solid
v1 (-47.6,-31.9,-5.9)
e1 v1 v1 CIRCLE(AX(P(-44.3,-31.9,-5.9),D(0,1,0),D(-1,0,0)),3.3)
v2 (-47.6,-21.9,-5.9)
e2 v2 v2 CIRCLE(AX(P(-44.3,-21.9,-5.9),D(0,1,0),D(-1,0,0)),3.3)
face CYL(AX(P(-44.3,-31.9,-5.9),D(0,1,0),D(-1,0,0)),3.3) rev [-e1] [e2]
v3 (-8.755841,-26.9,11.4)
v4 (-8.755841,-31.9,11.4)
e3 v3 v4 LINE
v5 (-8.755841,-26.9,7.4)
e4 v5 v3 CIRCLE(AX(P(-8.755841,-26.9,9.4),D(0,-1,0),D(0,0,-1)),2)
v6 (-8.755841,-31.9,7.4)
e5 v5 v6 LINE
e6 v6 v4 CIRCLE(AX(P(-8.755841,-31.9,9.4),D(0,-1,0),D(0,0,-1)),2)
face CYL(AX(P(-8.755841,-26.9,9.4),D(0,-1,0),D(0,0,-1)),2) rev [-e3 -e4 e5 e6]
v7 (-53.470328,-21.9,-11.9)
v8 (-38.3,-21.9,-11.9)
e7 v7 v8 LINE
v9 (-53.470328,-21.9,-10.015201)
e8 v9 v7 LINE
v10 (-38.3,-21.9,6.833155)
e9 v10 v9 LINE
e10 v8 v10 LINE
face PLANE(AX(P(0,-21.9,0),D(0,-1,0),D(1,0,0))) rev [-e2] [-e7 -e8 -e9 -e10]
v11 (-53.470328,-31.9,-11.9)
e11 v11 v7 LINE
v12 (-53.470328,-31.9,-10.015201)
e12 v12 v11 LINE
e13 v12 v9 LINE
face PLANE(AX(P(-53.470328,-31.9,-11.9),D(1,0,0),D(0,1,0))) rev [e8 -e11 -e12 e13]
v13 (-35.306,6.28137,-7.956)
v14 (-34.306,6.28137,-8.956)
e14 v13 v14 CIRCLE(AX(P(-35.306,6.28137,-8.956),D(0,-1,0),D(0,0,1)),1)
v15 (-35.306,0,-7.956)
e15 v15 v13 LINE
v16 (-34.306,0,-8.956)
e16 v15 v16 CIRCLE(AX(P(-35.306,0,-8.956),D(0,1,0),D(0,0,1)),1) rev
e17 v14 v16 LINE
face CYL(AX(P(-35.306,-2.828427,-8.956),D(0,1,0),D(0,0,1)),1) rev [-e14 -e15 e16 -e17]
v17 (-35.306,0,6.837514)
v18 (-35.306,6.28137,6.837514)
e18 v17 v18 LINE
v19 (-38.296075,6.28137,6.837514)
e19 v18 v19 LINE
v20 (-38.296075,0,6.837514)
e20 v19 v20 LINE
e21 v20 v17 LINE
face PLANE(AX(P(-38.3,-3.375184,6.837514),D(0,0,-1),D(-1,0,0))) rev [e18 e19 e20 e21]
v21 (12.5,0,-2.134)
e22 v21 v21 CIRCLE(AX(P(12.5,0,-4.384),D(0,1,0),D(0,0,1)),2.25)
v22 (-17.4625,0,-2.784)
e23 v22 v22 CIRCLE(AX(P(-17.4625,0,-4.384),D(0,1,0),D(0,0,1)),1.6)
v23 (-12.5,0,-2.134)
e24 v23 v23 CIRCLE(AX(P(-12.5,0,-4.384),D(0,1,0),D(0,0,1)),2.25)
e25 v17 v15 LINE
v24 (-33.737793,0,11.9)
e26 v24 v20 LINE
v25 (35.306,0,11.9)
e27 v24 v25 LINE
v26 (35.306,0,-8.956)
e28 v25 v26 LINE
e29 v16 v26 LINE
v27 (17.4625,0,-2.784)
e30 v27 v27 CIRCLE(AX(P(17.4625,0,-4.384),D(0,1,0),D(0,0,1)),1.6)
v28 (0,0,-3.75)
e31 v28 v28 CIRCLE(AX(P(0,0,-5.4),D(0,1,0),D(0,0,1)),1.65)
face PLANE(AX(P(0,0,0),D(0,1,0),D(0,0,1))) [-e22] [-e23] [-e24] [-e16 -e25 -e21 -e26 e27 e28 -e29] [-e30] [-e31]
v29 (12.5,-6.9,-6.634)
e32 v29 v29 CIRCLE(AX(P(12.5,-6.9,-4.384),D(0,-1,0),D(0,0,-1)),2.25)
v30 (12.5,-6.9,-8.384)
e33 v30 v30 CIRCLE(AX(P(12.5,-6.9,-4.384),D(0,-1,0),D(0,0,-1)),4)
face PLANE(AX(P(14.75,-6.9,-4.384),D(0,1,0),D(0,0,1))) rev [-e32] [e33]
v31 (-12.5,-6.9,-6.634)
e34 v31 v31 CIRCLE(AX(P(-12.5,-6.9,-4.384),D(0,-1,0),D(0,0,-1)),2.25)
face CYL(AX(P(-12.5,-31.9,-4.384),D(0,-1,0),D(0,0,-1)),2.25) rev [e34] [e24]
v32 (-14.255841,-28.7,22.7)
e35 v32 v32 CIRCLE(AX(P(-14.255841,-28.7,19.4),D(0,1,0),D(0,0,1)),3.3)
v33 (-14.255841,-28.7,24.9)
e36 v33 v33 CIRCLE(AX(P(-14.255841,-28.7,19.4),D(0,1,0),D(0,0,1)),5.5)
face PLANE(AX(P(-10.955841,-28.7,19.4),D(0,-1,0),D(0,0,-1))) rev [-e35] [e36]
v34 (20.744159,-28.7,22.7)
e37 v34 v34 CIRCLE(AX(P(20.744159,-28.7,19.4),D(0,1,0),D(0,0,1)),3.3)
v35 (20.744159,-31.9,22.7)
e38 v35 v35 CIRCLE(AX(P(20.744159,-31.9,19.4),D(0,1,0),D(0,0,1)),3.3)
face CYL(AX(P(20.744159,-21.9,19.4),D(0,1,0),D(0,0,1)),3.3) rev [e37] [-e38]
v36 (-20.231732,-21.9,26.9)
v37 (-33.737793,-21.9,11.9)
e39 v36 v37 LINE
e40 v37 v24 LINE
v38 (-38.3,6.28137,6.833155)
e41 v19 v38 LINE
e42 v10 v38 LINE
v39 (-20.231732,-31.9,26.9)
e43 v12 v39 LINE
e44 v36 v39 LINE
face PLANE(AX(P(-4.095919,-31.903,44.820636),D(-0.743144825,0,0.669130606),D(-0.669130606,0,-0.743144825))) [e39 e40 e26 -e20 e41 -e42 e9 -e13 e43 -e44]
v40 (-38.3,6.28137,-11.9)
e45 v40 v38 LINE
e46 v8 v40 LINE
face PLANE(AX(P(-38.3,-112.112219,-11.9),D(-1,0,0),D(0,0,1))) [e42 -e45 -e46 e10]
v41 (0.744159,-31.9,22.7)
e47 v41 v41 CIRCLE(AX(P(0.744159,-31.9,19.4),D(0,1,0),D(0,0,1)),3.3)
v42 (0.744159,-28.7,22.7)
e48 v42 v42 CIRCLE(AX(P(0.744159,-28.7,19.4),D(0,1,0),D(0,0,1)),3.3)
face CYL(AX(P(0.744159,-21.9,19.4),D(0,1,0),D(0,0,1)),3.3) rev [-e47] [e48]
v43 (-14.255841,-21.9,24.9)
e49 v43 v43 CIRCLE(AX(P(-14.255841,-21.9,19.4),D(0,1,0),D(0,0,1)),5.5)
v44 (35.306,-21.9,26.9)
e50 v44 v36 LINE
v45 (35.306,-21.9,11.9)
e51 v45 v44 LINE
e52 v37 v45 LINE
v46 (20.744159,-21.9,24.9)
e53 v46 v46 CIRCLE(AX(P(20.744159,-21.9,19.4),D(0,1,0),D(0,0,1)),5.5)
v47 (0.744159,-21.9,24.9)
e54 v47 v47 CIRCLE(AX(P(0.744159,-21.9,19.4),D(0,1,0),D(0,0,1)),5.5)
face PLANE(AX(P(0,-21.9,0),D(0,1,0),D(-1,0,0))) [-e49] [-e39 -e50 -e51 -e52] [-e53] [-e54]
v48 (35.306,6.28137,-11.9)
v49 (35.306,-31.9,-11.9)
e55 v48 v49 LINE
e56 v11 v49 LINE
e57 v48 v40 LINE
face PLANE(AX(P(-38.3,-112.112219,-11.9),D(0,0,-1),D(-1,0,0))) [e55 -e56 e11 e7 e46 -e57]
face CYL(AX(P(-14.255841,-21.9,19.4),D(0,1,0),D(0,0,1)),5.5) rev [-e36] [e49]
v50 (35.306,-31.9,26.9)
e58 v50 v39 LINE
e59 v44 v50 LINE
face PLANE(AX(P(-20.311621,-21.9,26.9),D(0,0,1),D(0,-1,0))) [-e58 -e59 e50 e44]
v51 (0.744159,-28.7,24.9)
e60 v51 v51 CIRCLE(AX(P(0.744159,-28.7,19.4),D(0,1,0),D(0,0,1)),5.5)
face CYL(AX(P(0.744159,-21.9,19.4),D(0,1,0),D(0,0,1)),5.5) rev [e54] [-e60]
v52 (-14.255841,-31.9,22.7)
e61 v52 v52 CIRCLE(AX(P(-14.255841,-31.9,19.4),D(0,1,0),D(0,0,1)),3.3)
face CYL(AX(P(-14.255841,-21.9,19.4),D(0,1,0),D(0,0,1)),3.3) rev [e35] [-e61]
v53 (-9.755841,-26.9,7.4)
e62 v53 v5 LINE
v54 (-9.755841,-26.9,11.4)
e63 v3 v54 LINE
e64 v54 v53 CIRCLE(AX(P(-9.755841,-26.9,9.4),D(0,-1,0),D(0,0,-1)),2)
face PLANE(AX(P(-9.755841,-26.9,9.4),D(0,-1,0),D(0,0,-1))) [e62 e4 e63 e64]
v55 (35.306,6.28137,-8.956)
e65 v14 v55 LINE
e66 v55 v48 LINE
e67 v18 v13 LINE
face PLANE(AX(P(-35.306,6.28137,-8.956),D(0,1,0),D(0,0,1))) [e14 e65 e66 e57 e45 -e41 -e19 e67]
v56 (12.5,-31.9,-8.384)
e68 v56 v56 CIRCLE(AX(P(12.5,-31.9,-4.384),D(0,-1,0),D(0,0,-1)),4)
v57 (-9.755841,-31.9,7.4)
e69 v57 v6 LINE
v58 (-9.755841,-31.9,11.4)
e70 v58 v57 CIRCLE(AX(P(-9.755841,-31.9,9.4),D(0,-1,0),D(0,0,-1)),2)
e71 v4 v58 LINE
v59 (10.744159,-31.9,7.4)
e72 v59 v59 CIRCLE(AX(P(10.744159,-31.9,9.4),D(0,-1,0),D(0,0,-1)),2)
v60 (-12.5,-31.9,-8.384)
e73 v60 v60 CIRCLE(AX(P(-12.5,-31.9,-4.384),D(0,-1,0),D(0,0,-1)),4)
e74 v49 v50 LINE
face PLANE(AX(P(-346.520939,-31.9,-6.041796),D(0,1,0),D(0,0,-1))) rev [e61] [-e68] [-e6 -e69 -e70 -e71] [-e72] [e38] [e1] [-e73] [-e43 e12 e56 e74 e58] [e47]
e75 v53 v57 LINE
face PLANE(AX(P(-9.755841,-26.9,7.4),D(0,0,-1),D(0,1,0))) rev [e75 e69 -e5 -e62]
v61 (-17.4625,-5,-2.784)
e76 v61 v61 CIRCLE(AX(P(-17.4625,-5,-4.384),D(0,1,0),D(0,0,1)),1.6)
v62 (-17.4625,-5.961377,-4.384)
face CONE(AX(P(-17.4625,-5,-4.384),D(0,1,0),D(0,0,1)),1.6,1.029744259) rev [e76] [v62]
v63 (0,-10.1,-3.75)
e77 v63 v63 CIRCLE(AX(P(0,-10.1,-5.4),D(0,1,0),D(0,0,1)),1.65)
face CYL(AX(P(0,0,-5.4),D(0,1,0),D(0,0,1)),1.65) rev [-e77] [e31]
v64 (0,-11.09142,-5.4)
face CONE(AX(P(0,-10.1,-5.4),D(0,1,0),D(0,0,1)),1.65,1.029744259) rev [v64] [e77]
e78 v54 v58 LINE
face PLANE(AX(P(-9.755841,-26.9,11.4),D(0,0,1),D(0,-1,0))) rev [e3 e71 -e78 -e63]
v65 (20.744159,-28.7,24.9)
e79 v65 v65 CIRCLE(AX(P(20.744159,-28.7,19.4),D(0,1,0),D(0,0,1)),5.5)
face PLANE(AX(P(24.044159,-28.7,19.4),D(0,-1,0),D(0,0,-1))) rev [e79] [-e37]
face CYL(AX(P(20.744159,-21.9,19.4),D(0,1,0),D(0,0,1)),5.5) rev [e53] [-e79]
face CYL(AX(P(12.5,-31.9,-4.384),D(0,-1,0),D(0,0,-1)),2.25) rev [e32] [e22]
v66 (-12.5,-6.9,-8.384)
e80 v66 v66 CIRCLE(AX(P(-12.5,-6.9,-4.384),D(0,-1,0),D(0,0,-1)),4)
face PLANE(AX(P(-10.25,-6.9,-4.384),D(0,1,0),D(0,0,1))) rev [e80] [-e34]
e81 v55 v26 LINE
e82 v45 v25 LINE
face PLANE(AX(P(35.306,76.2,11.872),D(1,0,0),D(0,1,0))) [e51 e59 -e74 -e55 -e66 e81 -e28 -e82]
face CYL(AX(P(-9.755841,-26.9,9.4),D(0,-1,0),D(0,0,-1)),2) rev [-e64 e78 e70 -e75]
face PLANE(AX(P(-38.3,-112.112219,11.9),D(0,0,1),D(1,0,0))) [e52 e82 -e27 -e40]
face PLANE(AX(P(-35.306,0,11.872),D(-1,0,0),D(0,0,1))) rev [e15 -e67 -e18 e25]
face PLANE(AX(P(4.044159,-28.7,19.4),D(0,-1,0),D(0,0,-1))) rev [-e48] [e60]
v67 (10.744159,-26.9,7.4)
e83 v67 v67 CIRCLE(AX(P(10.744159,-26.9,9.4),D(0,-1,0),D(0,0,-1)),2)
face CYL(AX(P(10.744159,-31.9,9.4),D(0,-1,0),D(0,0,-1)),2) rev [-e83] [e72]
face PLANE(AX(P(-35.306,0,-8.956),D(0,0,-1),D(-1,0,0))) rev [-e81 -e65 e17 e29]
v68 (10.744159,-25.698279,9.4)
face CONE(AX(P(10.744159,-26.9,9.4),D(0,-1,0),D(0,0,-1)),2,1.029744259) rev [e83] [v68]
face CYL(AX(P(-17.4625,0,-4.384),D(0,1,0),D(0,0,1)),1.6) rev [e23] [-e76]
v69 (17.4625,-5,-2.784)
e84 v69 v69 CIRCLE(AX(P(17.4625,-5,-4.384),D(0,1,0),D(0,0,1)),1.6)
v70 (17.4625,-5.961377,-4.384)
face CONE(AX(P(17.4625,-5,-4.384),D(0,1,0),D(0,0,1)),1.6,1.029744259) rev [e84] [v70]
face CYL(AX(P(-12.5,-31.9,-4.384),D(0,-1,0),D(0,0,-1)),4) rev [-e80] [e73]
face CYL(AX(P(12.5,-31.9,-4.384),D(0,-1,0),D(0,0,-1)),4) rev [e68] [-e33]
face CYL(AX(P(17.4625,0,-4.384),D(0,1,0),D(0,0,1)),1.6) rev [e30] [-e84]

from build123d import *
from build123d.topology import SkipClean

# Parameters (mm, degrees)
SKETCH_1_W                = 76.6
SKETCH_1_H                = 23.8
EXTRUDE_1_DEPTH           = 31.899999991
HOLE_WIZARD_M4_1_D        = 3.3
HOLE_WIZARD_M4_1_DEPTH    = 10.1
HOLE_WIZARD_M4_1_TIP      = 0.991420021
SKETCH_5_W                = 23.8
SKETCH_5_H                = 2.281370048
EXTRUDE_2_DEPTH           = 2.994
SKETCH_6_W                = 76.6
SKETCH_6_H                = 2.281370048
EXTRUDE_3_DEPTH           = 2.944
CUT_EXTRUDE_START         = -2.994
SKETCH_7_W                = 26.992148155
SKETCH_7_H                = 47.339562986
CUT_EXTRUDE_1_DEPTH       = 2.994
EXTRUDE_4_DEPTH           = 10
HOLE_WIZARD_3_D           = 6.6
HOLE_WIZARD_3_CBORE_D     = 11
HOLE_WIZARD_3_CBORE_DEPTH = 6.8
SKETCH_21_R               = 3.3
CUT_EXTRUDE_6_DEPTH       = 67.034934903
MM_2_D                    = 4
MM_2_DEPTH                = 5
MM_2_TIP                  = 1.201721238
CUT_EXTRUDE_7_DEPTH       = 5
SKETCH_26_W               = 46.053862543
SKETCH_26_H               = 10
CUT_EXTRUDE_8_DEPTH       = 76.924939501
CUT_EXTRUDE_9_DEPTH       = 67.034934903
SKETCH_29_R               = 1
CUT_EXTRUDE_10_DEPTH      = 2.281370048
EXTRUDE_START             = 4
EXTRUDE_5_DEPTH           = 4
CUT_EXTRUDE_11_DEPTH      = 0.5
EXTRUDE_6_DEPTH           = 0.440630619
CUT_EXTRUDE_12_DEPTH      = 28.181370038
SKETCH_35_W               = 0.294839433
SKETCH_35_H               = 10
CUT_EXTRUDE_13_DEPTH      = 100.471808588
CHAMFER_1_SIZE            = 2
HOLE_WIZARD_4_D           = 4.5
HOLE_WIZARD_4_CBORE_D     = 8
HOLE_WIZARD_4_CBORE_DEPTH = 25
CUT_EXTRUDE_14_DEPTH      = 67.233425798
CUT_EXTRUDE_15_DEPTH      = 6.281370048


with BuildPart() as part:
    # 草图1 → 凸台-拉伸1 (new body)
    with BuildSketch(Plane(origin=(0, 0, 0), x_dir=(1, 0, 0), z_dir=(0, 1, 0))):
        Rectangle(SKETCH_1_W, SKETCH_1_H)
    extrude(amount=-EXTRUDE_1_DEPTH)

    # M4 螺纹孔1
    with Locations(Plane(origin=(0, 0, -5.4), x_dir=(0, 0, 1), z_dir=(0, 1, 0))):
        with Locations((0, 0)):
            Hole(HOLE_WIZARD_M4_1_D / 2, depth=HOLE_WIZARD_M4_1_DEPTH)
            with Locations((0, 0, -(HOLE_WIZARD_M4_1_DEPTH + HOLE_WIZARD_M4_1_TIP / 2))):  # 118° drill point
                Cone(0, HOLE_WIZARD_M4_1_D / 2, HOLE_WIZARD_M4_1_TIP, mode=Mode.SUBTRACT)

    # 草图5 → 凸台-拉伸2 (add)
    with BuildSketch(Plane.ZY.offset(38.3)):
        with Locations((0, 1.140685024)):
            Rectangle(SKETCH_5_W, SKETCH_5_H)
    extrude(amount=-EXTRUDE_2_DEPTH)

    # 草图6 → 凸台-拉伸3 (add)
    with BuildSketch(Plane(origin=(0, 0, -11.9), x_dir=(-1, 0, 0), z_dir=(0, 0, -1))):
        with Locations((0, 1.140685024)):
            Rectangle(SKETCH_6_W, SKETCH_6_H)
    extrude(amount=-EXTRUDE_3_DEPTH)

    # 草图7 → 切除-拉伸1 (cut)
    with BuildSketch(Plane(origin=(38.3, 0, 0), x_dir=(0, 0, -1), z_dir=(1, 0, 0)).offset(CUT_EXTRUDE_START)):
        with Locations((-1.596074077, -8.230218498)):
            Rectangle(SKETCH_7_W, SKETCH_7_H)
    extrude(amount=CUT_EXTRUDE_1_DEPTH, mode=Mode.SUBTRACT)

    # 草图9 → 大小mm 暗销孔1 (revolve, cut)
    with BuildSketch(Plane(origin=(17.4625, 0, -4.384), x_dir=(0, 0, 1), z_dir=(1, 0, 0))):
        Polygon((0, 0), (0, 5.96137699), (1.6, 5), (1.6, 0), align=None)
    mm_1 = revolve(axis=Axis((17.4625, 6.35, -4.384), (0, -1, 0)), mode=Mode.SUBTRACT)

    # 镜向3: 大小mm 暗销孔1 across plane
    add(mm_1.mirror(Plane(origin=(0, 0, 0), x_dir=(0, 0, 1), z_dir=(1, 0, 0))), mode=Mode.SUBTRACT)

    # 草图16 → 凸台-拉伸4 (add)
    with BuildSketch(Plane.XZ.offset(31.899999991)):
        Polygon((-38.3, 6.921881597), (-55.247298311, -11.9), (-38.3, -11.9), align=None)
        Polygon((-33.817682057, 11.9), (-20.311621392, 26.9), (35.306, 26.9), (35.306, 11.9), align=None)
    extrude(amount=-EXTRUDE_4_DEPTH)

    # 打孔尺寸(%根据)内六角圆柱头螺钉的类型3 (through all)
    with Locations(Plane(origin=(-14.255841028, -21.899999991, 19.4), x_dir=(1, 0, 0), z_dir=(0, 1, 0))):
        with Locations((0, 0), (15, 0), (35, 0)):
            CounterBoreHole(HOLE_WIZARD_3_D / 2, HOLE_WIZARD_3_CBORE_D / 2, HOLE_WIZARD_3_CBORE_DEPTH)

    # 草图21 → 切除-拉伸6 (cut, through all)
    with BuildSketch(Plane(origin=(0, -21.899999991, 0), x_dir=(1, 0, 0), z_dir=(0, 1, 0))):
        with Locations(Location((-44.3, 5.9, 0), (0, 0, 180))):
            Circle(SKETCH_21_R)
    extrude(amount=-CUT_EXTRUDE_6_DEPTH, mode=Mode.SUBTRACT)

    # 大小mm 暗销孔2
    with Locations(Plane(origin=(10.744158972, -31.899999991, 9.4), x_dir=(0, 0, -1), z_dir=(0, -1, 0))):
        with Locations((0, 0)):
            Hole(MM_2_D / 2, depth=MM_2_DEPTH)
            with Locations((0, 0, -(MM_2_DEPTH + MM_2_TIP / 2))):  # 118° drill point
                Cone(0, MM_2_D / 2, MM_2_TIP, mode=Mode.SUBTRACT)

    # 草图25 → 切除-拉伸7 (cut)
    with BuildSketch(Plane.XZ.offset(31.899999991)):
        with BuildLine():
            Line((-9.755841028, 11.4), (-8.755841028, 11.4))
            ThreePointArc((-8.755841028, 11.4), (-6.755841028, 9.4), (-8.755841028, 7.4))
            Line((-8.755841028, 7.4), (-9.755841028, 7.4))
            ThreePointArc((-9.755841028, 7.4), (-11.755841028, 9.4), (-9.755841028, 11.4))
        make_face()
    extrude(amount=-CUT_EXTRUDE_7_DEPTH, mode=Mode.SUBTRACT)

    # 草图26 → 切除-拉伸8 (cut, through all)
    with BuildSketch(Plane(origin=(-24.593701474, 0, 22.144268272), x_dir=(0.6691306063588817, 0, 0.7431448254773731), z_dir=(-0.7431448254773731, 0, 0.6691306063588817))):
        with Locations((-11.827706241, -26.899999991)):
            Rectangle(SKETCH_26_W, SKETCH_26_H)
    extrude(amount=CUT_EXTRUDE_8_DEPTH, mode=Mode.SUBTRACT)

    # 草图27 → 切除-拉伸9 (cut, through all)
    with BuildSketch(Plane.XZ.offset(21.899999991)):
        Polygon((-38.3, 6.921881597), (-33.817682057, 11.9), (-38.3, 11.9), align=None)
    extrude(amount=-CUT_EXTRUDE_9_DEPTH, mode=Mode.SUBTRACT)

    # 草图29 → 切除-拉伸10 (cut)
    with BuildSketch(Plane(origin=(0, 2.281370048, 0), x_dir=(1, 0, 0), z_dir=(0, 1, 0))):
        with Locations((-35.306, 8.956)):
            Circle(SKETCH_29_R)
    extrude(amount=-CUT_EXTRUDE_10_DEPTH, mode=Mode.SUBTRACT)

    # 草图31 → 凸台-拉伸5 (add)
    with SkipClean():  # the faces are left unmerged after this step: merging them gives an invalid solid
        with BuildSketch(Plane(origin=(0, 2.281370048, 0), x_dir=(1, 0, 0), z_dir=(0, 1, 0)).offset(EXTRUDE_START)):
            with BuildLine():
                Line((-34.306, 8.956), (35.306, 8.956))
                Line((35.306, 8.956), (35.306, 11.9))
                Line((35.306, 11.9), (-38.3, 11.9))
                Line((-38.3, 11.9), (-38.3, -6.921881597))
                Line((-38.3, -6.921881597), (-35.306, -10.247055466))
                Line((-35.306, -10.247055466), (-35.306, 7.956))
                ThreePointArc((-35.306, 7.956), (-36.013106781, 9.663106781), (-34.306, 8.956))
            make_face()
        extrude(amount=-EXTRUDE_5_DEPTH)

    # 草图32 → 切除-拉伸11 (cut)
    with SkipClean():  # the faces are left unmerged after this step: merging them gives an invalid solid
        with BuildSketch(Plane(origin=(-24.593701474, 0, 22.144268272), x_dir=(0.6691306063588817, 0, 0.7431448254773731), z_dir=(-0.7431448254773731, 0, 0.6691306063588817))):
            Polygon((-23.813531784, -21.899999991), (-45.811081642, -21.899999991), (-45.811081642, -31.899999991), (7.49870663, -31.899999991), (7.49870663, -21.899999991), (-11.951824765, -21.899999991), (-11.951824765, 0), (-16.009278942, 0), (-16.009278942, 6.281370048), (-23.813531784, 6.281370048), align=None)
        extrude(amount=-CUT_EXTRUDE_11_DEPTH, mode=Mode.SUBTRACT)

    # 草图33 → 凸台-拉伸6 (add)
    with SkipClean():  # the faces are left unmerged after this step: merging them gives an invalid solid
        with BuildSketch(Plane(origin=(-24.222129061, 0, 21.809702968), x_dir=(0.6691306063588818, 0, 0.743144825477373), z_dir=(-0.743144825477373, 0, 0.6691306063588818))):
            Polygon((-45.36087962, -21.899999991), (-45.36087962, -31.899999991), (6.849670289, -31.899999991), (6.849670289, -21.899999991), (-13.334820655, -21.899999991), (-13.334820655, 0), (-16.564585199, 0), (-16.564585199, 6.281370048), (-21.03904799, 6.281370048), (-21.03904799, -21.899999991), align=None)
        extrude(amount=EXTRUDE_6_DEPTH)

    # 草图34 → 切除-拉伸12 (cut)
    with SkipClean():  # the faces are left unmerged after this step: merging them gives an invalid solid
        with BuildSketch(Plane(origin=(0, 6.281370048, 0), x_dir=(1, 0, 0), z_dir=(0, 1, 0))):
            Polygon((-38.3, -6.174643322), (-38.3, -6.833155448), (-38.627452364, -6.469482755), align=None)
            Polygon((-33.144865692, -11.9), (-33.737792674, -11.9), (-33.472318056, -12.194839433), align=None)
        extrude(amount=-CUT_EXTRUDE_12_DEPTH, mode=Mode.SUBTRACT)

    # 草图35 → 切除-拉伸13 (cut, through all)
    with SkipClean():  # the faces are left unmerged after this step: merging them gives an invalid solid
        with BuildSketch(Plane(origin=(35.306, 0, 0), x_dir=(0, 0, -1), z_dir=(1, 0, 0))):
            with Locations((-27.047419717, -26.899999991)):
                Rectangle(SKETCH_35_W, SKETCH_35_H)
        extrude(amount=-CUT_EXTRUDE_13_DEPTH, mode=Mode.SUBTRACT)

    # 倒角1
    # the kernel refuses this chamfer: 2 mm, written as the material it takes off along each edge
    with BuildSketch(Plane(origin=(-54.901934311, -16.756634015, -11.605160567), x_dir=(0.7244655223975905, 0, -0.6893110378176068), z_dir=(0, -1, 0))) as chamfer_1_piece_1:
        Polygon((CHAMFER_1_SIZE * 0.999621916911, CHAMFER_1_SIZE * 0.0274958766106), (-CHAMFER_1_SIZE * 0.0274958766106, CHAMFER_1_SIZE * 0.999621916911), (0, 0), align=None)
    extrude(amount=20.286731952, mode=Mode.SUBTRACT)
    with BuildSketch(Plane(origin=(-35.633452364, 0, 9.794656625), x_dir=(-0.6893110378176083, 0, -0.7244655223975892), z_dir=(0, 1, 0))) as chamfer_1_piece_2:
        Polygon((CHAMFER_1_SIZE * 0.999621916911, -CHAMFER_1_SIZE * 0.0274958766106), (-CHAMFER_1_SIZE * 0.0274958766106, -CHAMFER_1_SIZE * 0.999621916911), (0, 0), align=None)
    extrude(amount=11.424736024, mode=Mode.SUBTRACT)

    # 打孔尺寸(%根据)内六角圆柱头螺钉的类型4 (through all)
    with Locations(Plane(origin=(12.5, -31.899999991, -4.384), x_dir=(0, 0, -1), z_dir=(0, -1, 0))):
        with Locations((0, 0)):
            hole_wizard_4 = CounterBoreHole(HOLE_WIZARD_4_D / 2, HOLE_WIZARD_4_CBORE_D / 2, HOLE_WIZARD_4_CBORE_DEPTH)

    # 镜向4: 打孔尺寸(%根据)内六角圆柱头螺钉的类型4 across plane
    add(hole_wizard_4.mirror(Plane(origin=(0, 0, 0), x_dir=(0, 0, 1), z_dir=(1, 0, 0))), mode=Mode.SUBTRACT)

    # 草图39 → 切除-拉伸14 (cut, through all)
    with BuildSketch(Plane(origin=(0, -21.899999991, 0), x_dir=(1, 0, 0), z_dir=(0, 1, 0))):
        Polygon((-53.470328078, 11.9), (-53.470328078, 10.015200769), (-53.563673098, 10.118870916), align=None)
    extrude(amount=-CUT_EXTRUDE_14_DEPTH, mode=Mode.SUBTRACT)

    # 草图40 → 切除-拉伸15 (cut)
    with BuildSketch(Plane(origin=(0, 6.281370048, 0), x_dir=(1, 0, 0), z_dir=(0, 1, 0))):
        Polygon((-38.3, -6.837514338), (-35.306, -6.837514338), (-35.306, -8.395663323), (-36.971713577, -8.308366973), align=None)
    extrude(amount=-CUT_EXTRUDE_15_DEPTH, mode=Mode.SUBTRACT)


solid = part.part
